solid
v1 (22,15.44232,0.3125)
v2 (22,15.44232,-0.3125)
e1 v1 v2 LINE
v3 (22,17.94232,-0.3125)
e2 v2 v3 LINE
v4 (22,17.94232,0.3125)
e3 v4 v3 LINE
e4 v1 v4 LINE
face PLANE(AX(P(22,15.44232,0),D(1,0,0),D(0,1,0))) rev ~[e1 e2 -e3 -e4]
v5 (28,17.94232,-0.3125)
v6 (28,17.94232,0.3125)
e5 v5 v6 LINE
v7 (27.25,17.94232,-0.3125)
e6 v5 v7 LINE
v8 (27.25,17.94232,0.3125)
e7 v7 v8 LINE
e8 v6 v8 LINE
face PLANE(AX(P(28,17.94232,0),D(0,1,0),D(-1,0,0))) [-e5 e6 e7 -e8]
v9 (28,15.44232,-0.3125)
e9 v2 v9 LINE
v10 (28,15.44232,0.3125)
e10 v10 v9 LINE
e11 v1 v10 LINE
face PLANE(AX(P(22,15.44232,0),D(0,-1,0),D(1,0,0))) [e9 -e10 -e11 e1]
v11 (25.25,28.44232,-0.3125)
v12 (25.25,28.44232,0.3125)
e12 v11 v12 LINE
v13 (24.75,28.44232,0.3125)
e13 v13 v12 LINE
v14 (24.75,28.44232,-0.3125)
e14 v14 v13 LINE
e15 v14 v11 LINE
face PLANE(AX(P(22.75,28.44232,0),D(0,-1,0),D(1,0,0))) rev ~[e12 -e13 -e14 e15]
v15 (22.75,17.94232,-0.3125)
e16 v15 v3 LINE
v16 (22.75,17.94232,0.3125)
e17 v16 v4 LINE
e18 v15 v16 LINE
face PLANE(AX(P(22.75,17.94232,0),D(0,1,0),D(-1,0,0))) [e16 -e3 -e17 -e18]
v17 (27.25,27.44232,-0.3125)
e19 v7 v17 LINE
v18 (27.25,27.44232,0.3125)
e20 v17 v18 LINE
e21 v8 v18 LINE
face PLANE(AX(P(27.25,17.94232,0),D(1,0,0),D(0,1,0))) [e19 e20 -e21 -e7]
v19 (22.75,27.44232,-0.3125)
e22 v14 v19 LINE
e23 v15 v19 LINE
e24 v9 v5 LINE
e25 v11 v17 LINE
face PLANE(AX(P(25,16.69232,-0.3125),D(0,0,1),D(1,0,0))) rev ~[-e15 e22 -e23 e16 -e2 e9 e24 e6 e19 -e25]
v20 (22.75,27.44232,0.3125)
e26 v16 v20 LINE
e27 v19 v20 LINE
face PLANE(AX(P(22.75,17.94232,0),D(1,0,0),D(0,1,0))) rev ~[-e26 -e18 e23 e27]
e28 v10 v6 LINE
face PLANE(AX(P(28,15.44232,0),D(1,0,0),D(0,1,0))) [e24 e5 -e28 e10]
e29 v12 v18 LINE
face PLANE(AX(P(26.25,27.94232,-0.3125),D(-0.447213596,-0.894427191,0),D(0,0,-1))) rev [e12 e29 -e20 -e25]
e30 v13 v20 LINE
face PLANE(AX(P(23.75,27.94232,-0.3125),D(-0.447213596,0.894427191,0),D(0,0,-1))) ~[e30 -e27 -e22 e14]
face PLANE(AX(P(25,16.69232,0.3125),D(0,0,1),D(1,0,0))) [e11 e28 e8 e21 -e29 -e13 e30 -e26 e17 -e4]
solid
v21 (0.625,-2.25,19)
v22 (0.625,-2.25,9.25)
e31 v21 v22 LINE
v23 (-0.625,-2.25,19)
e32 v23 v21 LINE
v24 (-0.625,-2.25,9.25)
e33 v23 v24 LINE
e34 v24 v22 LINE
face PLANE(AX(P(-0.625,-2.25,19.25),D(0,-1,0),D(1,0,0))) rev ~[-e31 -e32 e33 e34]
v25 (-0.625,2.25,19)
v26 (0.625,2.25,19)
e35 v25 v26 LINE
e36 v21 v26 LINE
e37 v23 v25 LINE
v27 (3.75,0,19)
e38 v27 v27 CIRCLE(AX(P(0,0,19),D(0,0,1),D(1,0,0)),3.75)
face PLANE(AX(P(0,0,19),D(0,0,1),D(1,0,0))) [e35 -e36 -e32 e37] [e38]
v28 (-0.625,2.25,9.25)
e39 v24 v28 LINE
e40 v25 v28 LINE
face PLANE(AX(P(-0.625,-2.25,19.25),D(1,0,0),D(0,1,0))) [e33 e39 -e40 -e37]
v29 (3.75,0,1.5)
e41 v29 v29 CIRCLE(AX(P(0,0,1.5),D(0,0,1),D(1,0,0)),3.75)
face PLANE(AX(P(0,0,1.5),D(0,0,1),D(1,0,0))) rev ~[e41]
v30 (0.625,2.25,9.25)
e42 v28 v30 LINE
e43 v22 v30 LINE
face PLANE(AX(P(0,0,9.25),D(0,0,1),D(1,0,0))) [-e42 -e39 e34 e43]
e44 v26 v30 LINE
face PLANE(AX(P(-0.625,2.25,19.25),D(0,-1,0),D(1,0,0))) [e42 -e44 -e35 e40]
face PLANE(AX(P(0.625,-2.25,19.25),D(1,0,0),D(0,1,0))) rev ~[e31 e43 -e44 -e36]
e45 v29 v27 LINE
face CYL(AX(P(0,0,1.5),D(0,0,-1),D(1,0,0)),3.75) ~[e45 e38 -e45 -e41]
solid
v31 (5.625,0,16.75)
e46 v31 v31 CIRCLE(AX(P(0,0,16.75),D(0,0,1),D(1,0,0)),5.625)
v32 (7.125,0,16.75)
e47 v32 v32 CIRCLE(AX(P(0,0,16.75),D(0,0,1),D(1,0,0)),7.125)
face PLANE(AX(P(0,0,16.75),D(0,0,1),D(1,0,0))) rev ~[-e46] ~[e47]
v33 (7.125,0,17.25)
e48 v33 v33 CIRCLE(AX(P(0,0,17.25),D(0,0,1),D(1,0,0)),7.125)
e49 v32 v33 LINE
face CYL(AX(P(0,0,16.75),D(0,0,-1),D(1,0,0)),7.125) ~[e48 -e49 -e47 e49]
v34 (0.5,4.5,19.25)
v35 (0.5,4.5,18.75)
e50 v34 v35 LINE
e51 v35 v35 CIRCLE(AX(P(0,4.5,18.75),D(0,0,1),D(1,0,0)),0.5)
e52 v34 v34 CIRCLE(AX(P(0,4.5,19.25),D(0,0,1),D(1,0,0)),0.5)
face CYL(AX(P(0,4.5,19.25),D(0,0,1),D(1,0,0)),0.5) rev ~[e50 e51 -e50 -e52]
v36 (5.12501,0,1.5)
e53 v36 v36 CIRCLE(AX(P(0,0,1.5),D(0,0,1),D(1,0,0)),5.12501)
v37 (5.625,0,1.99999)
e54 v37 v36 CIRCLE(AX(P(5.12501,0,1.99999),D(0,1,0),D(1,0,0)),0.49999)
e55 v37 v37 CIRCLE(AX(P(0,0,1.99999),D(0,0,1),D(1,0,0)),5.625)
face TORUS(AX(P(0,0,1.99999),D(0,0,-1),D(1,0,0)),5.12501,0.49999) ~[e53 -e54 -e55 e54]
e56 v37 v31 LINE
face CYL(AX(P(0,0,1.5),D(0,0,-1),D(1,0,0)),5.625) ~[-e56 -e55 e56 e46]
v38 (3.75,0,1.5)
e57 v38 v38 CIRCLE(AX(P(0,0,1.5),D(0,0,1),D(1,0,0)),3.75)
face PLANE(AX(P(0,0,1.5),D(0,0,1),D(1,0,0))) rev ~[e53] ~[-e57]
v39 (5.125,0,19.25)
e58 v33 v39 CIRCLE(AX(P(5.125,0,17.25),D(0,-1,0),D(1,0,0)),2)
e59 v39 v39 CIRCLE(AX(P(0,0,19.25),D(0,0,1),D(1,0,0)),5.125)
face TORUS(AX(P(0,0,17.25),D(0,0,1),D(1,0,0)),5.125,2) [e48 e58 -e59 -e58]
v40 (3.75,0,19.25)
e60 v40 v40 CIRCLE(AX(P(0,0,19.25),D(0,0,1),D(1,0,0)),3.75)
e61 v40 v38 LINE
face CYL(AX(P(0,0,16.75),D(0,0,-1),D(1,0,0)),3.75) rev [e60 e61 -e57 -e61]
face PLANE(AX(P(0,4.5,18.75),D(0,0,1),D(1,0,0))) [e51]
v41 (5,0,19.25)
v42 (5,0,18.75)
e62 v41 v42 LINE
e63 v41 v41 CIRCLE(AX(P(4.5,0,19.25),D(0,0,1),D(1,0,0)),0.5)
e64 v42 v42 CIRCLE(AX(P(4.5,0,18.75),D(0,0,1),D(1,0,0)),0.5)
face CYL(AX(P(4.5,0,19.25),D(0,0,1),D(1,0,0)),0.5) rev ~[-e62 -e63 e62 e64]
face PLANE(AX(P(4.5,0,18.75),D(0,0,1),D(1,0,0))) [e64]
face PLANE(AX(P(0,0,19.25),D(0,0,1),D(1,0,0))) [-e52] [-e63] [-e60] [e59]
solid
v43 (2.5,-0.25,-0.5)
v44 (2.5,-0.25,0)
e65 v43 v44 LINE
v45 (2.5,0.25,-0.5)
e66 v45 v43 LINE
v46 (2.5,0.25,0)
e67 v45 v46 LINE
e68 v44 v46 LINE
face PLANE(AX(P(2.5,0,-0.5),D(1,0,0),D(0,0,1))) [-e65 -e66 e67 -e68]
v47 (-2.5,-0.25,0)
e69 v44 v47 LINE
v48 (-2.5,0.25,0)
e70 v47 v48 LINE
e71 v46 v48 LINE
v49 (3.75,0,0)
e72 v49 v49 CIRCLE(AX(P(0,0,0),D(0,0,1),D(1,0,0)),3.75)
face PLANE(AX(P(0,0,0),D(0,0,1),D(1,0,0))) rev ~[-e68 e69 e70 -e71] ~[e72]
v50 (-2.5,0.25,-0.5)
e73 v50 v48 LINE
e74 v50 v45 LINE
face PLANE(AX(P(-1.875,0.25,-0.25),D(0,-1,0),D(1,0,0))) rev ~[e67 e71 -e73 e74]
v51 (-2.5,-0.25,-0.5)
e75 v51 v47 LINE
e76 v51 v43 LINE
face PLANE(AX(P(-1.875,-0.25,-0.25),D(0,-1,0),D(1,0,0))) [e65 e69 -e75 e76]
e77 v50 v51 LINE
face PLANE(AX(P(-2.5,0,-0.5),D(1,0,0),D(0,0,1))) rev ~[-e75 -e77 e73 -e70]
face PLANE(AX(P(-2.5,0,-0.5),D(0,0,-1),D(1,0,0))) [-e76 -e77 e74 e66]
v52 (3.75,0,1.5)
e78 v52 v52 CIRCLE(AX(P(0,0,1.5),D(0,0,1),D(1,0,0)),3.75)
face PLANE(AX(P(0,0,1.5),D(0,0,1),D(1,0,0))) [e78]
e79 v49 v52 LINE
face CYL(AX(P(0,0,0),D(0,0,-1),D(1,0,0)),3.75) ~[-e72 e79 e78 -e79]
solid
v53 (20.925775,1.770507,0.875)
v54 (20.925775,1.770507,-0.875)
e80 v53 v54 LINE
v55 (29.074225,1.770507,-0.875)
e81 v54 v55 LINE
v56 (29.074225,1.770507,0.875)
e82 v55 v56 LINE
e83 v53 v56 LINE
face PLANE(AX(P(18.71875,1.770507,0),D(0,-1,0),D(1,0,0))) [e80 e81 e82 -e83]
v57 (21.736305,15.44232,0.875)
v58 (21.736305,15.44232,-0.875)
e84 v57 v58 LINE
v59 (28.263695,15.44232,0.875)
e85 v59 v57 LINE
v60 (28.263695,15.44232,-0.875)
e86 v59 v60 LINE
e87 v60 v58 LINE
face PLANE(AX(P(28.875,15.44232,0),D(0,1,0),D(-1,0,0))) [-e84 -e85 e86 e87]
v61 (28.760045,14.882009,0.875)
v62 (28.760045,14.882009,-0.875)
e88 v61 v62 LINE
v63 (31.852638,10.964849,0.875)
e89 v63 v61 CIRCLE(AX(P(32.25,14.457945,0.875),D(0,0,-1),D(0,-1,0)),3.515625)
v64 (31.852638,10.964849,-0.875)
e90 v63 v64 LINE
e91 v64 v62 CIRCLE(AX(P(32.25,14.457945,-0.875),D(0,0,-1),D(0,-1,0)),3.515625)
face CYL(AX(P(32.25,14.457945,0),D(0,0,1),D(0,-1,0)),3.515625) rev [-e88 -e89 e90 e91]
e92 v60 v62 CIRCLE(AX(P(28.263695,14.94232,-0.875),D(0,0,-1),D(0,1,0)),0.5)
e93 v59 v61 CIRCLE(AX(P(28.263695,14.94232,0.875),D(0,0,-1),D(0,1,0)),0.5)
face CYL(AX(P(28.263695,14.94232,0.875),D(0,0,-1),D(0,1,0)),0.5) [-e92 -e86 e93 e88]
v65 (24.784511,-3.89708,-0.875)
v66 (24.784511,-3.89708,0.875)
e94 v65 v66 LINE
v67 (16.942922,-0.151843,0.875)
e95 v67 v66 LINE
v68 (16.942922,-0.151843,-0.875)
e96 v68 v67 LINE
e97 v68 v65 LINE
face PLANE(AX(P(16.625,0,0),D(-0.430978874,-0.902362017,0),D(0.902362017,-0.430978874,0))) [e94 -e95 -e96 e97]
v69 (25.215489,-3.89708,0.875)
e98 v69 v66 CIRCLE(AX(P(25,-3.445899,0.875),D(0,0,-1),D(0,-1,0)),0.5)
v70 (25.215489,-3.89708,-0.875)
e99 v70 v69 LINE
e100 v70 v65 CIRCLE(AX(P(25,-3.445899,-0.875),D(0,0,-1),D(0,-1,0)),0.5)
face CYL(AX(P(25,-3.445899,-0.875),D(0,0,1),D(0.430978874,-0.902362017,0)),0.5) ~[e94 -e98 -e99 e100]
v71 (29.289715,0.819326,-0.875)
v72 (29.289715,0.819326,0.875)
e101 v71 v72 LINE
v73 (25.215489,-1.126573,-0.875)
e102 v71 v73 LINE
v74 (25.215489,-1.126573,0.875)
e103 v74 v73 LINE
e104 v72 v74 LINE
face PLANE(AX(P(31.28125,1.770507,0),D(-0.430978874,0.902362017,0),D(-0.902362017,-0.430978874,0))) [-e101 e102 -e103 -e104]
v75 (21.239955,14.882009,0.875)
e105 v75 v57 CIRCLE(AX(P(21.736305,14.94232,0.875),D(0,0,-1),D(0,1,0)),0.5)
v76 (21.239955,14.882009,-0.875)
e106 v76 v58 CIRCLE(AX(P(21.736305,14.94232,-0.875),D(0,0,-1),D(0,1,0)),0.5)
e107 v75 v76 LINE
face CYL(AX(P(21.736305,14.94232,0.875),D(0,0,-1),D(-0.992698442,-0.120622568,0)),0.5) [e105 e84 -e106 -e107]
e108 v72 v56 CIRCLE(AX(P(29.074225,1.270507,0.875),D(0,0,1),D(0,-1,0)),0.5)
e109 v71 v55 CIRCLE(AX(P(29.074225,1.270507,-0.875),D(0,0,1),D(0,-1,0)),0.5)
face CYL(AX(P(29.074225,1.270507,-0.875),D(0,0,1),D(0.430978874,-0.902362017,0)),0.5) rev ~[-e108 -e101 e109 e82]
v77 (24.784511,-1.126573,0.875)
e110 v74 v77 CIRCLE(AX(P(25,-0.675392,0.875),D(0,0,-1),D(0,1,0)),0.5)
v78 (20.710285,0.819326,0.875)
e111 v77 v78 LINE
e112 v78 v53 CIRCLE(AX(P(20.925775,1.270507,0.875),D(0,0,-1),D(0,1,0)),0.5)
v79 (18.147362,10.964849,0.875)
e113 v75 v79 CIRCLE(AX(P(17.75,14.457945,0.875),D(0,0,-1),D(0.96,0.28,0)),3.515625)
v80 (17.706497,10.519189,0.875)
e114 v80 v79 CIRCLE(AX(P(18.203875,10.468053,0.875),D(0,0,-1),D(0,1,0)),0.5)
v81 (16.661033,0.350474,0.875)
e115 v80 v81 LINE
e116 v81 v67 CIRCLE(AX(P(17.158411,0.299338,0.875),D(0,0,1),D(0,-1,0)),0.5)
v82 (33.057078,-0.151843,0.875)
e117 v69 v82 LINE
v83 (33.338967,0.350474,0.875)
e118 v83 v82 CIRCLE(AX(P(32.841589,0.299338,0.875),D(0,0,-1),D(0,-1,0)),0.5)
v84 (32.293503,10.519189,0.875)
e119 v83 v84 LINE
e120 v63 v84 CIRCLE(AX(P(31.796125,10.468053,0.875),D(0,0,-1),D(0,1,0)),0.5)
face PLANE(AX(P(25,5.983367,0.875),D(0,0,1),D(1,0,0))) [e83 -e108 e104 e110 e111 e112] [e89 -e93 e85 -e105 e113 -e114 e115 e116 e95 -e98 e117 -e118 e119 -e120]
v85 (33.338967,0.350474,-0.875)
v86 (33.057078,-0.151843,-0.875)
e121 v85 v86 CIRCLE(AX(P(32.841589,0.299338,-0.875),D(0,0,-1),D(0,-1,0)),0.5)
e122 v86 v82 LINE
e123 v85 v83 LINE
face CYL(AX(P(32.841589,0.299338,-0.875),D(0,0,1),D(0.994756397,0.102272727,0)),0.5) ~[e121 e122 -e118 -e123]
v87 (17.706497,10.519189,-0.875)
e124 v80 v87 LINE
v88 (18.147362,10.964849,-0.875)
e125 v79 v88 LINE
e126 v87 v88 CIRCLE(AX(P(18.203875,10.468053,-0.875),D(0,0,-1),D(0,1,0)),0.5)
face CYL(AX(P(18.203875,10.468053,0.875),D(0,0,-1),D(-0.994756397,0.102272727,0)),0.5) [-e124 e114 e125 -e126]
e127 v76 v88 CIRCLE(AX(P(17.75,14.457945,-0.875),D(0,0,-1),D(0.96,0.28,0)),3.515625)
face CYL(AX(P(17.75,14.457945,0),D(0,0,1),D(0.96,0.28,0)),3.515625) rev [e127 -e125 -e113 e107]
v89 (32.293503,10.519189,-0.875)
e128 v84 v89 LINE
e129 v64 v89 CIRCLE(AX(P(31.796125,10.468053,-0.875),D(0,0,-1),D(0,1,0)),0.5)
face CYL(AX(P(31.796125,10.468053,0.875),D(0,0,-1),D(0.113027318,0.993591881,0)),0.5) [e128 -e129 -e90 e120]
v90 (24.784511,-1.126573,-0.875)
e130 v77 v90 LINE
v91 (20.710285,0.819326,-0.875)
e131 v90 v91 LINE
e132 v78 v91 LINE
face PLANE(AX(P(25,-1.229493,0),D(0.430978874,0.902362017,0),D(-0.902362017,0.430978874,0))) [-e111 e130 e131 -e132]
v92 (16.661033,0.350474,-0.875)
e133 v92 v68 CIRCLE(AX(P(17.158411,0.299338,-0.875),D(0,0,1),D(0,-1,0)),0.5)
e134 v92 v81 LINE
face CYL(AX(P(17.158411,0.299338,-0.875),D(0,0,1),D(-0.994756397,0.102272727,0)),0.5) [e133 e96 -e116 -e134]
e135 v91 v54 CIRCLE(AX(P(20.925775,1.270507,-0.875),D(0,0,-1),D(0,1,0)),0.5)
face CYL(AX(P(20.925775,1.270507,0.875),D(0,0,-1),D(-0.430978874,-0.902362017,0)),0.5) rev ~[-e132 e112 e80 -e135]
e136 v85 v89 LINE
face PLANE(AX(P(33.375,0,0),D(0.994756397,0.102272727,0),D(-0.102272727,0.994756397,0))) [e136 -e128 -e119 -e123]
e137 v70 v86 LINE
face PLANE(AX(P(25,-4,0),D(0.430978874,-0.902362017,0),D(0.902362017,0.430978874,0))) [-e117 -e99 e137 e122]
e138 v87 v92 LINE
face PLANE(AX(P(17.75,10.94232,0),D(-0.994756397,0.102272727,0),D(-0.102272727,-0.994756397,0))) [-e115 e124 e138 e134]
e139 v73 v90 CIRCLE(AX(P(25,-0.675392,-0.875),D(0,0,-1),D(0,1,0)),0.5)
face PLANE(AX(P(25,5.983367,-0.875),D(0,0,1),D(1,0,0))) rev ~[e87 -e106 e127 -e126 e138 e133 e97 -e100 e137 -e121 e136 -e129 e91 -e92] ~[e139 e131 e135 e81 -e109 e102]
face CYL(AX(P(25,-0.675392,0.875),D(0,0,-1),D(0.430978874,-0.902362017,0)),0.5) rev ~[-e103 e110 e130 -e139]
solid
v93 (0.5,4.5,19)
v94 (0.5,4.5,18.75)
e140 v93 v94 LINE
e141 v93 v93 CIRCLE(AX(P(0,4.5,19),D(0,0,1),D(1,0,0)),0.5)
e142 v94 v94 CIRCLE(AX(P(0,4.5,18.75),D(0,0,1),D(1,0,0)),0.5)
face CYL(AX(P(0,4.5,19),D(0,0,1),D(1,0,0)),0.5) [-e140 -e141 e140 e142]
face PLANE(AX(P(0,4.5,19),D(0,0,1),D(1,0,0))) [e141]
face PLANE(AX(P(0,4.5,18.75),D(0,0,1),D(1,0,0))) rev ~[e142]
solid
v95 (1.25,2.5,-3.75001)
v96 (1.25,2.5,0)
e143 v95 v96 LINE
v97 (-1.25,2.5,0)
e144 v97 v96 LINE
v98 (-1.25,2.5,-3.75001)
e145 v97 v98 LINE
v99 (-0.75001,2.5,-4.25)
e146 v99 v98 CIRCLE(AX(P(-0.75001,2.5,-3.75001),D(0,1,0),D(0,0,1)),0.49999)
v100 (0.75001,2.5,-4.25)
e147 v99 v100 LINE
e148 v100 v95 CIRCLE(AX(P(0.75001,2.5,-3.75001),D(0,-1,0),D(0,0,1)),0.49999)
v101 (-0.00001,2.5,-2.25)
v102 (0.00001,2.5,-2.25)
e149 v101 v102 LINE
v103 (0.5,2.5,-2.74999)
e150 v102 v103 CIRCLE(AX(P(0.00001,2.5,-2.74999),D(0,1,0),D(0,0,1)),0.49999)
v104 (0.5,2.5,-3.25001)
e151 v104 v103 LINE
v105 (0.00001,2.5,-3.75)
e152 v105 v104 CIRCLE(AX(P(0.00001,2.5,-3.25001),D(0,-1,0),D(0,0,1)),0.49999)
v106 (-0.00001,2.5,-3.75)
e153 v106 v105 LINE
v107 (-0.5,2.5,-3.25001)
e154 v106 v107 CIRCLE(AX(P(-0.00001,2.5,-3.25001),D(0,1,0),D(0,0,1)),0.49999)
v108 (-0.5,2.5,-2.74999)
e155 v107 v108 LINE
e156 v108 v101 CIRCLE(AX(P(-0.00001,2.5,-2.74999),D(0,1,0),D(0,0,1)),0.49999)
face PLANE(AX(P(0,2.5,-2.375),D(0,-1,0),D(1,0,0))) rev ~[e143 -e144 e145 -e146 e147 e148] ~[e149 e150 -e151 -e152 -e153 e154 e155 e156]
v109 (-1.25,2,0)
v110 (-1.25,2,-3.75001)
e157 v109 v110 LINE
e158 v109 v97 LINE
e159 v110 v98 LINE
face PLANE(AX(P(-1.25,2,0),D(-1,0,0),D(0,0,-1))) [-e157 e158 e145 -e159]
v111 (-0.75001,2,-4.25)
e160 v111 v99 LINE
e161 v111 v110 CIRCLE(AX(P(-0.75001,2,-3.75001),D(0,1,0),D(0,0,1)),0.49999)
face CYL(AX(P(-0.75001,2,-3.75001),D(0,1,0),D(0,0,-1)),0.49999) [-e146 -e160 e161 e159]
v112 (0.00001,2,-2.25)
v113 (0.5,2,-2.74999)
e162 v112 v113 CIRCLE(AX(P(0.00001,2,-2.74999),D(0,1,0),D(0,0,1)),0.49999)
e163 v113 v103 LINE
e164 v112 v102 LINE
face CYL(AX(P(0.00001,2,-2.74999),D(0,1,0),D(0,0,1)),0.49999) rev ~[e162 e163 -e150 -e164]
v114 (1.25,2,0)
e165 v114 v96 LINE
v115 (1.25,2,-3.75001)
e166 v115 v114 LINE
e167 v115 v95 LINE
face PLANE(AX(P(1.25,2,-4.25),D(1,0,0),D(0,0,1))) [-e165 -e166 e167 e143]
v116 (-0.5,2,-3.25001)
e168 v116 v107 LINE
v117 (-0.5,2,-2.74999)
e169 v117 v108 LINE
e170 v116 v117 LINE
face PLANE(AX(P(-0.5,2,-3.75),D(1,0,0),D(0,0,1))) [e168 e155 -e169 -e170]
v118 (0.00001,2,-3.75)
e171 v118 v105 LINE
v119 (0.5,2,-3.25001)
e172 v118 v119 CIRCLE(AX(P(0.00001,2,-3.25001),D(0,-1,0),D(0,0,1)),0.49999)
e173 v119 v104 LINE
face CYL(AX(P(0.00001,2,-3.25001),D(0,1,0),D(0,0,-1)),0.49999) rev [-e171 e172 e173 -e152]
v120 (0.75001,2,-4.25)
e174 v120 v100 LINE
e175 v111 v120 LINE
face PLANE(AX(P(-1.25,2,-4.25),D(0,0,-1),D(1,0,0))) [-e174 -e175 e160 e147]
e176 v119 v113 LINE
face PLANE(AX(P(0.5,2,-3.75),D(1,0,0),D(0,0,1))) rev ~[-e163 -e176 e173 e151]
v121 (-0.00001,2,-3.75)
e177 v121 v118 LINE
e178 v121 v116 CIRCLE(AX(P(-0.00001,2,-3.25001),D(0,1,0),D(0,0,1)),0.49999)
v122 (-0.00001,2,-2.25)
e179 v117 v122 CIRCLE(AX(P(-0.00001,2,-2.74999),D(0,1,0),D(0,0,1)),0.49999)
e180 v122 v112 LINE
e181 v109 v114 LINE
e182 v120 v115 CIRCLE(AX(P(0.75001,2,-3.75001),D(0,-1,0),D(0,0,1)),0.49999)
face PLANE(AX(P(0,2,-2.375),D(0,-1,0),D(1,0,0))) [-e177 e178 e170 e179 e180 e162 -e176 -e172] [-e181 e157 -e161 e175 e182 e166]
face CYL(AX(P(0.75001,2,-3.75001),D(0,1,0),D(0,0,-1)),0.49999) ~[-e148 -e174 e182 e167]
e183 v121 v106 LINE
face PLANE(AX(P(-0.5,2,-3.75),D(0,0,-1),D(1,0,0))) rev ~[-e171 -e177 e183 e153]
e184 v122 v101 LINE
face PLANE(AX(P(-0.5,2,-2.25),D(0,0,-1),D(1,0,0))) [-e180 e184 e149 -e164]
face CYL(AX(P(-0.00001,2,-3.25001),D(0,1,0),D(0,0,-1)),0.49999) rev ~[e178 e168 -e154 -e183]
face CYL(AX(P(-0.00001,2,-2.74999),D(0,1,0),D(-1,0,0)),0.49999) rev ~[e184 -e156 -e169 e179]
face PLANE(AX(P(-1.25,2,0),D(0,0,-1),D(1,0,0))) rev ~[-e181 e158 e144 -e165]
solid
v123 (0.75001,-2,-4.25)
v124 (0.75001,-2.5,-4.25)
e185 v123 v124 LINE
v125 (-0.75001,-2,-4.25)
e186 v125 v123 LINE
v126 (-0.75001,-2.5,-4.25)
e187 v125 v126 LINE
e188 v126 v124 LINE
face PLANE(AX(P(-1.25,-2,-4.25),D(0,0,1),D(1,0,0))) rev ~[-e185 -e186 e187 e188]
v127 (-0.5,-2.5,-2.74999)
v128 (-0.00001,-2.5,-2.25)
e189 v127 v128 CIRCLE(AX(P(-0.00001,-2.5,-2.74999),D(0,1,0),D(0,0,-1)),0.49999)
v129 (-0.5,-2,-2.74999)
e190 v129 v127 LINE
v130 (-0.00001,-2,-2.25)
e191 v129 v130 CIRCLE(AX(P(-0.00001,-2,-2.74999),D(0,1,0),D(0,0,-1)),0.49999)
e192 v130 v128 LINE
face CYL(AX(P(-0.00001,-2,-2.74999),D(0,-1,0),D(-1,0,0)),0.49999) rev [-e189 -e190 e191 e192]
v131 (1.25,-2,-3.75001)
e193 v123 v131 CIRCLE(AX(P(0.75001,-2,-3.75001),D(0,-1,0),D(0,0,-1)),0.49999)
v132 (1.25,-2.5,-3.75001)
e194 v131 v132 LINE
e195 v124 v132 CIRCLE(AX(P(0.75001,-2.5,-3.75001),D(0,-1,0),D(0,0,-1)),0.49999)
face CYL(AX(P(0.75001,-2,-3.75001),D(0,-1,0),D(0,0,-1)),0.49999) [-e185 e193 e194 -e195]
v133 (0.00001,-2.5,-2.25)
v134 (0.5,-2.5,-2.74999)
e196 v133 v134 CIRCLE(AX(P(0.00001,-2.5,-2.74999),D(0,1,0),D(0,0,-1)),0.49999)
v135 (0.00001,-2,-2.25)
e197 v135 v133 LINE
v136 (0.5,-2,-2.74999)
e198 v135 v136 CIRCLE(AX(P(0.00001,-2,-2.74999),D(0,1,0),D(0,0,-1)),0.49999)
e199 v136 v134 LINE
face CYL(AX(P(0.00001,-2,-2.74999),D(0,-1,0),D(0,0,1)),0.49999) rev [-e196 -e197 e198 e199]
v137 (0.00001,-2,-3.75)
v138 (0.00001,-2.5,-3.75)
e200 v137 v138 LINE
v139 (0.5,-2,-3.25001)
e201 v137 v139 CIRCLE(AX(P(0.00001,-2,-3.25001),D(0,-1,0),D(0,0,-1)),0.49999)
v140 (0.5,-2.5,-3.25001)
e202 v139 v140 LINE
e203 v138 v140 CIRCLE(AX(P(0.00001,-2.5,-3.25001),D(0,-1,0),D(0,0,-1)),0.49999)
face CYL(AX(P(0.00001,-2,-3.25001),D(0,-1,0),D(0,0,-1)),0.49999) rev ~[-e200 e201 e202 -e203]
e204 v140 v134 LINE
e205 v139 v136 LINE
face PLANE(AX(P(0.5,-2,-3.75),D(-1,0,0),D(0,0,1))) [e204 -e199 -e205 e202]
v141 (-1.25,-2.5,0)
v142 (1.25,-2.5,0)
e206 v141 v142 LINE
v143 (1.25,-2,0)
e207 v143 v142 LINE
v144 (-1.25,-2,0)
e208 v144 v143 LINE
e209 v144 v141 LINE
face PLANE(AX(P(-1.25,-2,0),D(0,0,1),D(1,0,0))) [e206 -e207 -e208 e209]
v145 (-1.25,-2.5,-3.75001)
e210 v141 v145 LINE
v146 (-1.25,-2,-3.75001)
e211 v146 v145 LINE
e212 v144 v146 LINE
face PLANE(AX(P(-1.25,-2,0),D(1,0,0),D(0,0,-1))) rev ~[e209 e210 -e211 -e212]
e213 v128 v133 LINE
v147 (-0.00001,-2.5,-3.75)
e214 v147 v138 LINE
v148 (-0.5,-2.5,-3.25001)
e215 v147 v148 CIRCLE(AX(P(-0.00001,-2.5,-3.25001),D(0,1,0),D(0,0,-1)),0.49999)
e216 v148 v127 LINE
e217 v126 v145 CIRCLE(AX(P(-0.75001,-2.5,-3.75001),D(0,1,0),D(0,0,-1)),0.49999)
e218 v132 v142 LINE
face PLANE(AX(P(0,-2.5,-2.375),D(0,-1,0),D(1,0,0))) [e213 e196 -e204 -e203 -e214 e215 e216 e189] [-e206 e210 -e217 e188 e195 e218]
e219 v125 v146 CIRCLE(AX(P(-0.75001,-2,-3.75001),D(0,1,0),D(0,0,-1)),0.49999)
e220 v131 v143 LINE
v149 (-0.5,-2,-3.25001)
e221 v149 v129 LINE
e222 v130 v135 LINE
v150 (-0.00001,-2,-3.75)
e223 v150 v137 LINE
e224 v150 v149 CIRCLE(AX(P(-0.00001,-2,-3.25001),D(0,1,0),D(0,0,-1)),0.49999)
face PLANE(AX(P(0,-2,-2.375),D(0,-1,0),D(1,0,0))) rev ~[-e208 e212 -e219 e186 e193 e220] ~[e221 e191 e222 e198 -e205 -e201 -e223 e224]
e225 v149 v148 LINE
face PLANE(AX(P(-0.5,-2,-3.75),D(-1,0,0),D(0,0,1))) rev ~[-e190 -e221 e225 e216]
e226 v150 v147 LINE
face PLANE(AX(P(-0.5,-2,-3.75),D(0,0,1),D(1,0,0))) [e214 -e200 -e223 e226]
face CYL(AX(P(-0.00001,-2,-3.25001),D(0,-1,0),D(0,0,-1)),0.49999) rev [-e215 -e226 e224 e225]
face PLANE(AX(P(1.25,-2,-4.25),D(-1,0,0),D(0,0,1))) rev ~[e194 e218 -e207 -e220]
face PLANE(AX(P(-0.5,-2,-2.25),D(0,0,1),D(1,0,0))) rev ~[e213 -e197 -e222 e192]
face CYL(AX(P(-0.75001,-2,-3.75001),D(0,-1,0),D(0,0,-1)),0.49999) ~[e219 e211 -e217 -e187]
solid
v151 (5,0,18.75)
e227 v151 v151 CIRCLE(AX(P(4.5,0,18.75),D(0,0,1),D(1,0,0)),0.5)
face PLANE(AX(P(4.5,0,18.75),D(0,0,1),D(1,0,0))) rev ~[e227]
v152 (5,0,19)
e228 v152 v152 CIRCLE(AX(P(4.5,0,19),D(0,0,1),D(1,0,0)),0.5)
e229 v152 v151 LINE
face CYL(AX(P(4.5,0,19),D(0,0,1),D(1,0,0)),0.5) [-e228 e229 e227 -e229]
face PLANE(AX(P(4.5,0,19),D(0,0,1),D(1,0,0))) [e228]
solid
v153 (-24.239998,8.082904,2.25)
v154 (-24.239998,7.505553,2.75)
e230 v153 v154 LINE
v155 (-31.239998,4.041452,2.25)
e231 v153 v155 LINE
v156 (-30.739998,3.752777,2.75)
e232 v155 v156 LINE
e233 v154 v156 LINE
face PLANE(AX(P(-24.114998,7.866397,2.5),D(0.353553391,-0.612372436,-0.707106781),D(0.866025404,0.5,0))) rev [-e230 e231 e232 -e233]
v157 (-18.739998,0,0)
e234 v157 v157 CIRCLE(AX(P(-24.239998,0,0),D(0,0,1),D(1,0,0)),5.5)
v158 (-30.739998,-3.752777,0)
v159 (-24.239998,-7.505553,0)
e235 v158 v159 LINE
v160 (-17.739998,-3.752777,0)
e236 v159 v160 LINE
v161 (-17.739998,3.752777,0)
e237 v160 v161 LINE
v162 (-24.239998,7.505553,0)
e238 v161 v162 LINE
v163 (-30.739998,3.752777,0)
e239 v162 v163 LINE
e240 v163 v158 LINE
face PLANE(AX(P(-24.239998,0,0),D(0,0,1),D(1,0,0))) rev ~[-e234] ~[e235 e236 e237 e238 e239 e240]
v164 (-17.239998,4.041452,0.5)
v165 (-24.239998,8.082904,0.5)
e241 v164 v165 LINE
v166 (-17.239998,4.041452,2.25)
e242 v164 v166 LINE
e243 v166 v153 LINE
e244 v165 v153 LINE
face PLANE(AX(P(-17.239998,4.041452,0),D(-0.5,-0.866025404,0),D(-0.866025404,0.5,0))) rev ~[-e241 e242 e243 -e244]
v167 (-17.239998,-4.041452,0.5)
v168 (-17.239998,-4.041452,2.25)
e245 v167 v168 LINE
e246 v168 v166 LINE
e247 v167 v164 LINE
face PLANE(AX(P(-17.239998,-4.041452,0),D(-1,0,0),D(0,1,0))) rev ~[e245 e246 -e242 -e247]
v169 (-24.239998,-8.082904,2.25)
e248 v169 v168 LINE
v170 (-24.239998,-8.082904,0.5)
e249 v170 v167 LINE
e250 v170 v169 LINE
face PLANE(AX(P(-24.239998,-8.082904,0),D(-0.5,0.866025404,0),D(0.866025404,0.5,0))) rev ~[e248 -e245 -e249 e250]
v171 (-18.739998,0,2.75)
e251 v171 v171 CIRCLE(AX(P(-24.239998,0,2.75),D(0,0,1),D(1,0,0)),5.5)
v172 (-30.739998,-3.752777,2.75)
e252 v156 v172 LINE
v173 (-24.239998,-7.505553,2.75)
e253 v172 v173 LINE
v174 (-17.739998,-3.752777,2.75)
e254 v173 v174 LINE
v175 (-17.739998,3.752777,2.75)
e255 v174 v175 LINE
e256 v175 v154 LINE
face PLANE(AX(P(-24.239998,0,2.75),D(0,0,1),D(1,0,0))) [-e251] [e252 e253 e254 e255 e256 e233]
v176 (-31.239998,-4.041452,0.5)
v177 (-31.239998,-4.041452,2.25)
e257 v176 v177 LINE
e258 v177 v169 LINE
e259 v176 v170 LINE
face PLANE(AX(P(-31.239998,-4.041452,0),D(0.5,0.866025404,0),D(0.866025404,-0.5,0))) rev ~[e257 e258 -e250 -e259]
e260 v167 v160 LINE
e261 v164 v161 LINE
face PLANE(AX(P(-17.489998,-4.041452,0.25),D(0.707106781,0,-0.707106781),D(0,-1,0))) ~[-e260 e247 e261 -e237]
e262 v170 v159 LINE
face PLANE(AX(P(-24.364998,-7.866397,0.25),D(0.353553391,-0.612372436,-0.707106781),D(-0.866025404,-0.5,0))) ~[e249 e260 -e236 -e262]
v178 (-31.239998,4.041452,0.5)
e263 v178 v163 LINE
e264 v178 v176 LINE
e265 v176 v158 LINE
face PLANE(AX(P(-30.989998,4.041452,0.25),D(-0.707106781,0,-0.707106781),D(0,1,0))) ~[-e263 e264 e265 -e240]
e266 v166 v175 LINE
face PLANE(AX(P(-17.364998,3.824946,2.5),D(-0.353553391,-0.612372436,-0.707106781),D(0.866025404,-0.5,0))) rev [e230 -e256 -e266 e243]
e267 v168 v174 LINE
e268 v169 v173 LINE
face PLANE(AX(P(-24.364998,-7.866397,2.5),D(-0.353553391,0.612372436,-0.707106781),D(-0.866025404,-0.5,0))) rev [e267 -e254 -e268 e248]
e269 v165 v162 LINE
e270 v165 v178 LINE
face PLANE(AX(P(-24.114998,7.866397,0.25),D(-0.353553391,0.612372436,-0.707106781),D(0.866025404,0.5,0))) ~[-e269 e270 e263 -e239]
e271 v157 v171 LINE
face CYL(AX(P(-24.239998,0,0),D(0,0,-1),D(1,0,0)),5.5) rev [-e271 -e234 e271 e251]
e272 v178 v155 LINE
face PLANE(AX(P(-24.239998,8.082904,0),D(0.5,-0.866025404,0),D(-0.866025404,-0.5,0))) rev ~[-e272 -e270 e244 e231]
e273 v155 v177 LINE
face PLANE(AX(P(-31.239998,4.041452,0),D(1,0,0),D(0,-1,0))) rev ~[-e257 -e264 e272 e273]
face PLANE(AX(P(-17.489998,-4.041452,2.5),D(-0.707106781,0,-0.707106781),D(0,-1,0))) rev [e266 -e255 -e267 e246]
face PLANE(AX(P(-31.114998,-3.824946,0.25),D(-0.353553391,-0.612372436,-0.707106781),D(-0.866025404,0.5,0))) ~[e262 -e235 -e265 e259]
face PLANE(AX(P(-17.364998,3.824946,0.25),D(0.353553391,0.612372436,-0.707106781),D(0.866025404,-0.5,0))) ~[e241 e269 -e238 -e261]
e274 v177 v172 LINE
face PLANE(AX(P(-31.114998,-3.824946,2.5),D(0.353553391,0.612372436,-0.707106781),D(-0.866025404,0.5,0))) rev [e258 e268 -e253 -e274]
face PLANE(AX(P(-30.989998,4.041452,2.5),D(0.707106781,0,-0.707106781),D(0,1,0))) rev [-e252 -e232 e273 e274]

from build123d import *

# Parameters (mm, degrees)
F0_R      = 3.75
F1_DEPTH  = 1.5
F2_START  = 1.5
F0_R_2    = 5.625
F2_DEPTH  = 15.25
F3_START  = 16.75
F0_R_3    = 7.125
F3_DEPTH  = 2.5
F4_DEPTH  = 17.5
F5_W      = 1.25
F5_H      = 4.5
F6_DEPTH  = 10
F5_R      = 0.5
F7_DEPTH  = 0.5
F8_START  = -0.25
F8_DEPTH  = 0.25
F9_W      = 1.25
F9_H      = 0.5
F9_W_2    = 2.5
F10_DEPTH = 0.25
F11_START = 2
F9_H_2    = 3.75
F9_W_3    = 1
F9_H_3    = 1.5
F11_DEPTH = 0.5
F12_START = -2
F12_DEPTH = 0.5
F13_R     = 2
F14_R     = 0.49999
F14_2_R   = 0.49999
F14_3_R   = 0.49999
F15_R     = 5.5
F16_DEPTH = 2.75
F17_SIZE  = 0.5
F19_DEPTH = 0.875
F18_W     = 4.5
F18_H     = 2.5
F18_W_2   = 0.75
F18_H_2   = 10.5
F20_DEPTH = 0.3125
F21_R     = 0.5
F22_SIZE2 = 1
F22_SIZE  = 2


# Not quite as in the source:
# - a fillet or chamfer is up to 0.001 mm smaller than in the source, because OpenCascade refuses the exact size


with BuildPart() as f1:
    # F0 (on Top) → F1 (new body)
    with BuildSketch(Plane.XY):
        Circle(F0_R)
    extrude(amount=F1_DEPTH)


with BuildPart() as f2:
    # F0 (on Top) → F2 (new body)
    with BuildSketch(Plane.XY.offset(F2_START)):
        Circle(F0_R_2)
        Circle(F0_R, mode=Mode.SUBTRACT)
    extrude(amount=F2_DEPTH)

    # F0 (on Top) → F3 (join)
    with BuildSketch(Plane.XY.offset(F3_START)):
        Circle(F0_R_3)
        Circle(F0_R_2, mode=Mode.SUBTRACT)
        Circle(F0_R_2)
        Circle(F0_R, mode=Mode.SUBTRACT)
    extrude(amount=F3_DEPTH)

    # F5 (on face) → F7 (cut)
    with BuildSketch(Plane.XY.offset(19.25)):
        with Locations((0, 4.5)):
            Circle(F5_R)
        with Locations((4.5, 0)):
            Circle(F5_R)
    extrude(amount=-F7_DEPTH, mode=Mode.SUBTRACT)

    # F13
    f13_edges = [f2.edges().sort_by_distance(p)[0] for p in [
        (-7.125, 0, 19.25),
    ]]
    fillet(f13_edges, radius=F13_R)

    # F14#3 (radius 0.5 in the source; OpenCascade refuses exactly that, so slightly less here)
    f14_3_edges = [f2.edges().sort_by_distance(p)[0] for p in [
        (-5.625, 0, 1.5),
    ]]
    fillet(f14_3_edges, radius=F14_3_R)


with BuildPart() as f4:
    # F4 (new, through all): a face of the model
    f4_faces = [f1.part.faces().sort_by_distance(p)[0] for p in [
        (0, 0, 1.5),
    ]]
    extrude(f4_faces, amount=F4_DEPTH)

    # F5 (on face) → F6 (cut)
    with BuildSketch(Plane.XY.offset(19.25)):
        Rectangle(F5_W, F5_H)
    extrude(amount=-F6_DEPTH, mode=Mode.SUBTRACT)


with BuildPart() as f8:
    # F5 (on face) → F8 (new body)
    with BuildSketch(Plane.XY.offset(19.25).offset(F8_START)):
        with Locations((0, 4.5)):
            Circle(F5_R)
    extrude(amount=-F8_DEPTH)


with BuildPart() as f8b:
    # F5 (on face) → F8, piece 2 (new body)
    with BuildSketch(Plane.XY.offset(19.25).offset(F8_START)):
        with Locations((4.5, 0)):
            Circle(F5_R)
    extrude(amount=-F8_DEPTH)


with BuildPart() as f1_1:
    add(f1.part)

    # F9 (on Front) → F10 (join, symmetric)
    with BuildSketch(Plane.XZ):
        with Locations((-1.875, -0.25)):
            Rectangle(F9_W, F9_H)
        with Locations((0, -0.25)):
            Rectangle(F9_W_2, F9_H)
        with Locations((1.875, -0.25)):
            Rectangle(F9_W, F9_H)
    extrude(amount=F10_DEPTH, both=True)


with BuildPart() as f11:
    # F9 (on Front) → F11 (new body)
    with BuildSketch(Plane.XZ.offset(F11_START)):
        with Locations((0, -2.375)):
            Rectangle(F9_W_2, F9_H_2)
        with Locations((0, -3)):
            Rectangle(F9_W_3, F9_H_3, mode=Mode.SUBTRACT)
        with Locations((0, -0.25)):
            Rectangle(F9_W_2, F9_H)
    extrude(amount=F11_DEPTH)

    # F14#2 (radius 0.5 in the source; OpenCascade refuses exactly that, so slightly less here)
    f14_2_edges = [f11.edges().sort_by_distance(p)[0] for p in [
        (1.25, -2.25, -4.25),
        (-1.25, -2.25, -4.25),
        (-0.5, -2.25, -2.25),
        (0.5, -2.25, -2.25),
        (0.5, -2.25, -3.75),
        (-0.5, -2.25, -3.75),
    ]]
    fillet(f14_2_edges, radius=F14_2_R)


with BuildPart() as f12:
    # F9 (on Front) → F12 (new body)
    with BuildSketch(Plane.XZ.offset(F12_START)):
        with Locations((0, -2.375)):
            Rectangle(F9_W_2, F9_H_2)
        with Locations((0, -3)):
            Rectangle(F9_W_3, F9_H_3, mode=Mode.SUBTRACT)
        with Locations((0, -0.25)):
            Rectangle(F9_W_2, F9_H)
    extrude(amount=-F12_DEPTH)

    # F14 (radius 0.5 in the source; OpenCascade refuses exactly that, so slightly less here)
    f14_edges = [f12.edges().sort_by_distance(p)[0] for p in [
        (1.25, 2.25, -4.25),
        (-1.25, 2.25, -4.25),
        (-0.5, 2.25, -2.25),
        (0.5, 2.25, -2.25),
        (0.5, 2.25, -3.75),
        (-0.5, 2.25, -3.75),
    ]]
    fillet(f14_edges, radius=F14_R)


with BuildPart() as f16:
    # F15 (on Top) → F16 (new body)
    with BuildSketch(Plane.XY):
        Polygon((-31.2399982514, 4.0414518843), (-31.2399982514, -4.0414518843), (-24.2399982514, -8.0829037687), (-17.2399982514, -4.0414518843), (-17.2399982514, 4.0414518843), (-24.2399982514, 8.0829037687), align=None)
        with Locations((-24.2399982514, 0)):
            Circle(F15_R, mode=Mode.SUBTRACT)
    extrude(amount=F16_DEPTH)

    # F17
    f17_edges = [f16.edges().sort_by_distance(p)[0] for p in [
        (-20.739998, -6.062178, 2.75),
        (-27.739998, -6.062178, 2.75),
        (-31.239998, 0, 2.75),
        (-27.739998, 6.062178, 2.75),
        (-20.739998, 6.062178, 2.75),
        (-17.239998, 0, 2.75),
        (-20.739998, 6.062178, 0),
        (-27.739998, 6.062178, 0),
        (-31.239998, 0, 0),
        (-27.739998, -6.062178, 0),
        (-20.739998, -6.062178, 0),
        (-17.239998, 0, 0),
    ]]
    chamfer(f17_edges, length=F17_SIZE)


with BuildPart() as f19:
    # F18 (on Top) → F19 (new body, symmetric)
    with BuildSketch(Plane.XY):
        with BuildLine():
            Line((17.75, 10.9423203664), (16.625, 0))
            Line((16.625, 0), (25, -4))
            Line((25, -4), (33.375, 0))
            Line((33.375, 0), (32.25, 10.9423203664))
            ThreePointArc((32.25, 10.9423203664), (29.4375, 12.3485703664), (28.875, 15.4423203664))
            Line((28.875, 15.4423203664), (28, 15.4423203664))
            Line((28, 15.4423203664), (27.25, 15.4423203664))
            Line((27.25, 15.4423203664), (22.75, 15.4423203664))
            Line((22.75, 15.4423203664), (22, 15.4423203664))
            Line((22, 15.4423203664), (21.125, 15.4423203664))
            ThreePointArc((21.125, 15.4423203664), (20.5625, 12.3485703664), (17.75, 10.9423203664))
        make_face()
        Polygon((31.28125, 1.7705066837), (25, -1.2294933163), (18.71875, 1.7705066837), align=None, mode=Mode.SUBTRACT)
    extrude(amount=F19_DEPTH, both=True)

    # F21
    f21_edges = [f19.edges().sort_by_distance(p)[0] for p in [
        (18.71875, 1.770507, 0),
        (25, -1.229493, 0),
        (31.28125, 1.770507, 0),
        (33.375, 0, 0),
        (25, -4, 0),
        (16.625, 0, 0),
        (32.25, 10.94232, 0),
        (28.875, 15.44232, 0),
        (21.125, 15.44232, 0),
        (17.75, 10.94232, 0),
    ]]
    fillet(f21_edges, radius=F21_R)


with BuildPart() as f20:
    # F18 (on Top) → F20 (new body, symmetric)
    with BuildSketch(Plane.XY):
        with Locations((25, 16.6923203664)):
            Rectangle(F18_W, F18_H)
        with Locations((27.625, 16.6923203664)):
            Rectangle(F18_W_2, F18_H)
        with Locations((22.375, 16.6923203664)):
            Rectangle(F18_W_2, F18_H)
        with Locations((25, 23.1923203664)):
            Rectangle(F18_W, F18_H_2)
    extrude(amount=F20_DEPTH, both=True)

    # F22
    f22_edges = [f20.edges().sort_by_distance(p)[0] for p in [
        (27.25, 28.44232, 0),
        (22.75, 28.44232, 0),
    ]]
    f22_side = f20.faces().sort_by_distance((25, 28.44232, 0))[0]
    chamfer(f22_edges, length=F22_SIZE, length2=F22_SIZE2, reference=f22_side)


solid = Compound([f2.part, f4.part, f8.part, f8b.part, f1_1.part, f11.part, f12.part, f16.part, f19.part, f20.part])
